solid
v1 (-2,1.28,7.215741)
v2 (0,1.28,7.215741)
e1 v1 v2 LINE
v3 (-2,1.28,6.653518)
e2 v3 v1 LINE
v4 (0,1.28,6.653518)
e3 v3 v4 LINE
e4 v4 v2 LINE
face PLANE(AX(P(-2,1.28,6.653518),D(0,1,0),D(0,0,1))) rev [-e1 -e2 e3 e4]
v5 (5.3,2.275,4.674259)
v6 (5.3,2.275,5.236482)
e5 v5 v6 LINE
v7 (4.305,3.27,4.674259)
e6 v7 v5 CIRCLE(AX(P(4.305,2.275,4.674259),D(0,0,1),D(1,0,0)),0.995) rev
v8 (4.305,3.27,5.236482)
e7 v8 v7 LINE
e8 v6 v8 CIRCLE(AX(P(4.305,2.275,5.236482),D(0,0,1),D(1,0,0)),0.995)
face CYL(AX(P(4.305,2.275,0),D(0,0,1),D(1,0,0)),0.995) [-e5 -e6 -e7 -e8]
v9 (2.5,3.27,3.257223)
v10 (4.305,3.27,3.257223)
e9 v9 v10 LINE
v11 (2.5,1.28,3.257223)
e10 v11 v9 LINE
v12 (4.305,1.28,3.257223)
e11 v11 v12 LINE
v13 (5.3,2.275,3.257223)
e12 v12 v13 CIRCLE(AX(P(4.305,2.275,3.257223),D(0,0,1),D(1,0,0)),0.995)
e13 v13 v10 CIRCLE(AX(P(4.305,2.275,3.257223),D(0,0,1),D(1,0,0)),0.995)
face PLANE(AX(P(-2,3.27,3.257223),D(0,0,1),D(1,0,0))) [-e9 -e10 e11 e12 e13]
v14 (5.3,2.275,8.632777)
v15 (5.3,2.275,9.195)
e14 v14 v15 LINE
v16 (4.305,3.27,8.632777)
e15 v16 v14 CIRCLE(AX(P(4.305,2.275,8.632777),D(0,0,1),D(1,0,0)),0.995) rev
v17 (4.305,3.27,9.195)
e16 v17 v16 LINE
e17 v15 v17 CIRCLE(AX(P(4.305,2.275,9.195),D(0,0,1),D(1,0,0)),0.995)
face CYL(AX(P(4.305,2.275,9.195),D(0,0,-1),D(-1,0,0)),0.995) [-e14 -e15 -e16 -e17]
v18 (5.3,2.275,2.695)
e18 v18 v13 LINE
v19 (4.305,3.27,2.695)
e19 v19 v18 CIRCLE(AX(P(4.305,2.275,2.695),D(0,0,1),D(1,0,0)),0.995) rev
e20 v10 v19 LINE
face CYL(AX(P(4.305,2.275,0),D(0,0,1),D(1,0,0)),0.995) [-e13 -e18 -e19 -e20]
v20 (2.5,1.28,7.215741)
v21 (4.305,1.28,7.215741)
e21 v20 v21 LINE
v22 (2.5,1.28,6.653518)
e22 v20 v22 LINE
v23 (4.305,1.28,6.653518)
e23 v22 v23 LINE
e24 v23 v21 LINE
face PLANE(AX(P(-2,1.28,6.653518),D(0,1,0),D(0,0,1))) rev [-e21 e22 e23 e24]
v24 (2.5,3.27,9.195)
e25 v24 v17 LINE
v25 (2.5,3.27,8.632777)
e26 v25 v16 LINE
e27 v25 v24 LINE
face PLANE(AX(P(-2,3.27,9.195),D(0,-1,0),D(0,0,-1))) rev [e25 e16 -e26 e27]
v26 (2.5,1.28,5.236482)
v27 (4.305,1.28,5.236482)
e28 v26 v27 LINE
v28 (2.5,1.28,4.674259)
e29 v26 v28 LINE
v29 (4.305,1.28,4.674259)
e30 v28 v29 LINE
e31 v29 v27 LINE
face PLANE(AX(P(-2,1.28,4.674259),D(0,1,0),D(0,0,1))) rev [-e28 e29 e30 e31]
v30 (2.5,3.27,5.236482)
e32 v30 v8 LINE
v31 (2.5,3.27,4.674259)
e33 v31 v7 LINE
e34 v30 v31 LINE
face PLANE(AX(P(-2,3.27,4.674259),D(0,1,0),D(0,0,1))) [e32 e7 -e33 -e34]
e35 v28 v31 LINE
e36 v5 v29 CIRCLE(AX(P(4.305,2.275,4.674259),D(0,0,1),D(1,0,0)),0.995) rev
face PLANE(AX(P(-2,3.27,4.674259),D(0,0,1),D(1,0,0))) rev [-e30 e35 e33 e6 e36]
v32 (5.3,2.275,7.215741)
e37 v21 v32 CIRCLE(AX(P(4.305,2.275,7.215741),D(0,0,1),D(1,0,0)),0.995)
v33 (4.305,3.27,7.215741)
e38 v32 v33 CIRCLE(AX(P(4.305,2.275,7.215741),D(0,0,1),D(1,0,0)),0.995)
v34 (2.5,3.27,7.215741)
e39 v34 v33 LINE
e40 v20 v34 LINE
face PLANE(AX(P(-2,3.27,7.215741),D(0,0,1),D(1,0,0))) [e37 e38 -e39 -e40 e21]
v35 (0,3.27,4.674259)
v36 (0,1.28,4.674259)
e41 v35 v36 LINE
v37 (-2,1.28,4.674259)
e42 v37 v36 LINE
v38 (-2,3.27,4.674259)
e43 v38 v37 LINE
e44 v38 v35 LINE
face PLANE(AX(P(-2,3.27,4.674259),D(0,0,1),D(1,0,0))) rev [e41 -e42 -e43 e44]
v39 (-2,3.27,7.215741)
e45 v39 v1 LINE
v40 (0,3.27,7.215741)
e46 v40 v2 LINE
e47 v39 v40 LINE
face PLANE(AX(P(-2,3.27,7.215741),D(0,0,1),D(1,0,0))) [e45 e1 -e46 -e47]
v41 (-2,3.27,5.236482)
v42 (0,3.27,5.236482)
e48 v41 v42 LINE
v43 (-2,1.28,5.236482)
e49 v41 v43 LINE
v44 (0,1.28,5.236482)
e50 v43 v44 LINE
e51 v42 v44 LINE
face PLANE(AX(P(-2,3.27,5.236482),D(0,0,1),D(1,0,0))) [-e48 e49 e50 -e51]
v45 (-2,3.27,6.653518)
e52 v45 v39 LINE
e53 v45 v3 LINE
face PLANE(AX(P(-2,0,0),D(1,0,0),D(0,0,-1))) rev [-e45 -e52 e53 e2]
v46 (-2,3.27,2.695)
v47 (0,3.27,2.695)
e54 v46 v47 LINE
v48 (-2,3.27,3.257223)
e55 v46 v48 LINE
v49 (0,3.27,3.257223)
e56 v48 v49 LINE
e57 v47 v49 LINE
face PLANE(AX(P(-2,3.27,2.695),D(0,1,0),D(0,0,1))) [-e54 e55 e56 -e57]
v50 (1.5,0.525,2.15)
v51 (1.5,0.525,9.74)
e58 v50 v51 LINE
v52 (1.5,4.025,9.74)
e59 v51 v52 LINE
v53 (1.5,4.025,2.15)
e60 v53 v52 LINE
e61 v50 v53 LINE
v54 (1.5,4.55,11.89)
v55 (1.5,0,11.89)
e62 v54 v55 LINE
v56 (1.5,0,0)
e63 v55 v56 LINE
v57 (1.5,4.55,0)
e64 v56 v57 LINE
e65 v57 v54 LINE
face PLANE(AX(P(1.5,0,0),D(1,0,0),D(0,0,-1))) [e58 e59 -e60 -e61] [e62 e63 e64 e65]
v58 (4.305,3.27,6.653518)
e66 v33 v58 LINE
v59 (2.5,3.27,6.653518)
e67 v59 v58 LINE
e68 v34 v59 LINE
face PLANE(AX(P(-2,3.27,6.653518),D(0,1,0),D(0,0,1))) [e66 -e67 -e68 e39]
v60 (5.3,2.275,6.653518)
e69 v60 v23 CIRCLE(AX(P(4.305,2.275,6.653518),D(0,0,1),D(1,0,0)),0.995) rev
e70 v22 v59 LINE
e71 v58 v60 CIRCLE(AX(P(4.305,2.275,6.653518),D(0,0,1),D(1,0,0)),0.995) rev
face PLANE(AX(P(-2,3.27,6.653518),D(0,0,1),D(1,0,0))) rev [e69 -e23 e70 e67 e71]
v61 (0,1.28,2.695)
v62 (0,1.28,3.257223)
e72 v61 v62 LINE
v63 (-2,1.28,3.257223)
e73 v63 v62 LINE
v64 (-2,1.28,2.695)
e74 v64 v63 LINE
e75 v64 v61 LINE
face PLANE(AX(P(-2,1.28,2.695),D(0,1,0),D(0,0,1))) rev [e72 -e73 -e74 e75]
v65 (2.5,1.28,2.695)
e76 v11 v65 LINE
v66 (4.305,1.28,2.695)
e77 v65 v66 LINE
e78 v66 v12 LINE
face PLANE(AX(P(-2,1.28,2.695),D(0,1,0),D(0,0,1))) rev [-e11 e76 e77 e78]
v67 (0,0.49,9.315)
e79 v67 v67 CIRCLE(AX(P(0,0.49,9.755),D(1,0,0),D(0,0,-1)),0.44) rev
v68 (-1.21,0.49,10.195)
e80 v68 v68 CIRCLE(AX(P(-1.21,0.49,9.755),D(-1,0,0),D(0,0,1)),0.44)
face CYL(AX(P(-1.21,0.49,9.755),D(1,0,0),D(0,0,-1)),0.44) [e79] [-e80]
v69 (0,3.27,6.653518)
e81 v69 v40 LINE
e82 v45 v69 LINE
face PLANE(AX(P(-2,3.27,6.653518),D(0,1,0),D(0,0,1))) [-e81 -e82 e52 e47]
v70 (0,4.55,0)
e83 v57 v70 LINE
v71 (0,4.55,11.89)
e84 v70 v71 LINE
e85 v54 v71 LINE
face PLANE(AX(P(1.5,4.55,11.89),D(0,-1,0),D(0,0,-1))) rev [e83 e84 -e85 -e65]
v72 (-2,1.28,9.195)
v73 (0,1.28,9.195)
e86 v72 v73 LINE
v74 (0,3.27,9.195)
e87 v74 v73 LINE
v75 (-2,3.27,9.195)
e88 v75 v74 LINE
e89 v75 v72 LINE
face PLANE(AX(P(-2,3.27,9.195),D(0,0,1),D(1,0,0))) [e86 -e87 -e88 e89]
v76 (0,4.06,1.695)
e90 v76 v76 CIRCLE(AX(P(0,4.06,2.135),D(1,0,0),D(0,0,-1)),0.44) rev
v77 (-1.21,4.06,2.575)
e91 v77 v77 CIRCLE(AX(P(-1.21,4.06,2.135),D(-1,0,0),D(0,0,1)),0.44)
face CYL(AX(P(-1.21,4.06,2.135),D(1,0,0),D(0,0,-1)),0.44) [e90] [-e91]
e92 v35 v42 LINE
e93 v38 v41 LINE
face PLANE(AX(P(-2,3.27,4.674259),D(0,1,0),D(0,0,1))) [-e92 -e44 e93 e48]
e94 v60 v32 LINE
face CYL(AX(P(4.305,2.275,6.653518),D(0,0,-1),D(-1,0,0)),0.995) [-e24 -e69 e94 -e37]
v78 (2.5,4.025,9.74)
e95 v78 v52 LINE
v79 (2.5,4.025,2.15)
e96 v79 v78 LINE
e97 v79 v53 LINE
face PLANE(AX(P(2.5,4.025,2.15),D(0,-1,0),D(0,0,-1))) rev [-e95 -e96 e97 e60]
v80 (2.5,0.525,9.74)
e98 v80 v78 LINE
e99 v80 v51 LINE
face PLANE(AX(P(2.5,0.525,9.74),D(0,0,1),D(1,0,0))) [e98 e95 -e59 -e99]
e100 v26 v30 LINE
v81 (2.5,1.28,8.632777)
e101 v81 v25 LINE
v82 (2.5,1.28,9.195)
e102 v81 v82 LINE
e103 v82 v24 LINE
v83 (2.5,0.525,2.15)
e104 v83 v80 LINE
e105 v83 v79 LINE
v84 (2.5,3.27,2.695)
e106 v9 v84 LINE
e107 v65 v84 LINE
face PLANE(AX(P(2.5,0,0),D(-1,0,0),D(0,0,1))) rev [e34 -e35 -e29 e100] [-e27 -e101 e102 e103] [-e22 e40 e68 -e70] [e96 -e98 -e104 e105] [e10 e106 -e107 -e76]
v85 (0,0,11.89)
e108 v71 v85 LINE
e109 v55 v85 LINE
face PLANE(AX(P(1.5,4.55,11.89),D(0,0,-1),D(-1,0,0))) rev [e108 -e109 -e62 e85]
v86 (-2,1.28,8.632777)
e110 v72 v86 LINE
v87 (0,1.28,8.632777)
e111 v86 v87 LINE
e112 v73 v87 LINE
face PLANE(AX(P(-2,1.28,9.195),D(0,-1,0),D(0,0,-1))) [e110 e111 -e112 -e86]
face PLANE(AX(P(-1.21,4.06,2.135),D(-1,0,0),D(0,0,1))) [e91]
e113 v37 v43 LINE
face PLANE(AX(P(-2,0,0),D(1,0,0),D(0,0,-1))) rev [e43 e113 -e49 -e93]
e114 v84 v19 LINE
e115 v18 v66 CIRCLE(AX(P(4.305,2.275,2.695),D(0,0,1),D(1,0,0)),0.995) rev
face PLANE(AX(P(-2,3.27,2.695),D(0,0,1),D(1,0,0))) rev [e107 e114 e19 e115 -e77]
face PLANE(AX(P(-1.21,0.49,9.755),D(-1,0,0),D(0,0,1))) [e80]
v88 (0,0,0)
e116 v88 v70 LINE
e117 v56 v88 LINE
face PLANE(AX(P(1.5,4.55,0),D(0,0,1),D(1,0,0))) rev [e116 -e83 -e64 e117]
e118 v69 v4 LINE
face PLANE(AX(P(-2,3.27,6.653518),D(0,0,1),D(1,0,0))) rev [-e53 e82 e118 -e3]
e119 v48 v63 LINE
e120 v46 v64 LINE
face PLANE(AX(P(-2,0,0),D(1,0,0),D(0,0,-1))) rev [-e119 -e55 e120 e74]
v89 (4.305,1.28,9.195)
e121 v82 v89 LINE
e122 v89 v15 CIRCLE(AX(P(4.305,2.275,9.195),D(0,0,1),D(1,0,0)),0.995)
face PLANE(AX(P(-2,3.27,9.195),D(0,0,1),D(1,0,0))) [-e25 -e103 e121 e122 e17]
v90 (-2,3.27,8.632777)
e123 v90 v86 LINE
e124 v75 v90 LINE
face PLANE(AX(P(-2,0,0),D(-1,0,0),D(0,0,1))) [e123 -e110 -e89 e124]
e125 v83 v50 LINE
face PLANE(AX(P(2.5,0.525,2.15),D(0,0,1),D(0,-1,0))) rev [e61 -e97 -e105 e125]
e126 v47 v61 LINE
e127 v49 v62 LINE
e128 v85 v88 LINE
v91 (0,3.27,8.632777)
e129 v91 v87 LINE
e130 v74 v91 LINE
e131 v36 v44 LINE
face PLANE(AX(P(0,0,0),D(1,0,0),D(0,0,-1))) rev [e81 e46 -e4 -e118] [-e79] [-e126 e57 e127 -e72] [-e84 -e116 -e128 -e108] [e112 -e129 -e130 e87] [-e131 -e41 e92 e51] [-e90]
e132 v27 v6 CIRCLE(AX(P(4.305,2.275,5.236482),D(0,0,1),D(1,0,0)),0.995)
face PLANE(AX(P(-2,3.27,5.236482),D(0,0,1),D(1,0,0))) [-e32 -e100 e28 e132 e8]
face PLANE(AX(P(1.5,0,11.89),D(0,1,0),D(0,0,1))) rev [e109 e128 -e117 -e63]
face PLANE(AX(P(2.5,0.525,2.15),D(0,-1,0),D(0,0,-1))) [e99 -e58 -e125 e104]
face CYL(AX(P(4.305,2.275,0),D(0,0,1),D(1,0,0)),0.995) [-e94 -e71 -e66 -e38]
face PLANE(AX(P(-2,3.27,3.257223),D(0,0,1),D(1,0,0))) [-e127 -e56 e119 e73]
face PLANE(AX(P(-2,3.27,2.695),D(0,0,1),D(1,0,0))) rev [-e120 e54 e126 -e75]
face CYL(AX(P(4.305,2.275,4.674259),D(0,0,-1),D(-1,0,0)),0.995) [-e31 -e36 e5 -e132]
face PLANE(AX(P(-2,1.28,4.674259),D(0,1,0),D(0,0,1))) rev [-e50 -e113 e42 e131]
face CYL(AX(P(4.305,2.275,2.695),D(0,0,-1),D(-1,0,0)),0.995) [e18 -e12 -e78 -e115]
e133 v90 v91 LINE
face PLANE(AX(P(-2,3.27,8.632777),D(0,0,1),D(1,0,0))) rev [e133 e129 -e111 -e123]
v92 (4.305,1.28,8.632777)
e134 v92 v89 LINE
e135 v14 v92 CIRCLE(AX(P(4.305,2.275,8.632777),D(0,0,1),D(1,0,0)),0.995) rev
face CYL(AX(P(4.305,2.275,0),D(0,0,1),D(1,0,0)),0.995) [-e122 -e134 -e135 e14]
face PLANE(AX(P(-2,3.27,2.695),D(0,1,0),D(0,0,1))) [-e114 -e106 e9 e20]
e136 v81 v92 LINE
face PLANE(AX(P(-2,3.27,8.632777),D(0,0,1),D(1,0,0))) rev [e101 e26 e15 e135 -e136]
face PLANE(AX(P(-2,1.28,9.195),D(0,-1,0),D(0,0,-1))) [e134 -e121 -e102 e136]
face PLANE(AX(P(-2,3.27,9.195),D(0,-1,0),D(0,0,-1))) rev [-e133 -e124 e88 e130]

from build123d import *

# Parameters (mm, degrees)
ESQUISSE2_W        = 11.89
ESQUISSE2_H        = 4.55
BOSS_EXTRU_1_DEPTH = 1.5
ESQUISSE7_W        = 7.59
ESQUISSE7_H        = 3.5
BOSS_EXTRU_2_DEPTH = 1
ESQUISSE8_W        = 0.56222282
ESQUISSE8_H        = 1.99
BOSS_EXTRU_4_DEPTH = 7.3
CONG_6_R           = 0.995
ESQUISSE12_R       = 0.44
BOSS_EXTRU_5_DEPTH = 1.21


with BuildPart() as part:
    # Esquisse2 → Boss.-Extru.1 (new body)
    with BuildSketch(Plane(origin=(0, 0, 0), x_dir=(0, 0, -1), z_dir=(1, 0, 0))):
        with Locations((-5.945, 2.275)):
            Rectangle(ESQUISSE2_W, ESQUISSE2_H)
    extrude(amount=BOSS_EXTRU_1_DEPTH)

    # Esquisse7 → Boss.-Extru.2 (add)
    with BuildSketch(Plane(origin=(1.5, 0, 0), x_dir=(0, 0, -1), z_dir=(1, 0, 0))):
        with Locations((-5.945, 2.275)):
            Rectangle(ESQUISSE7_W, ESQUISSE7_H)
    extrude(amount=BOSS_EXTRU_2_DEPTH)

    # Esquisse8 → Boss.-Extru.4 (add)
    with BuildSketch(Plane(origin=(5.3, 0, 0), x_dir=(0, 0, -1), z_dir=(1, 0, 0))):
        with Locations((-6.93462953, 2.275)):
            Rectangle(ESQUISSE8_W, ESQUISSE8_H)
        with Locations((-2.97611141, 2.275)):
            Rectangle(ESQUISSE8_W, ESQUISSE8_H)
        with Locations((-8.91388859, 2.275)):
            Rectangle(ESQUISSE8_W, ESQUISSE8_H)
        with Locations((-4.95537047, 2.275)):
            Rectangle(ESQUISSE8_W, ESQUISSE8_H)
    extrude(amount=-BOSS_EXTRU_4_DEPTH)

    # Congé6
    cong_6_edges = [part.edges().sort_by_distance(p)[0] for p in [
        (5.3, 1.28, 2.97611141),
        (5.3, 1.28, 4.95537047),
        (5.3, 1.28, 6.93462953),
        (5.3, 1.28, 8.91388859),
        (5.3, 3.27, 8.91388859),
        (5.3, 3.27, 6.93462953),
        (5.3, 3.27, 4.95537047),
        (5.3, 3.27, 2.97611141),
    ]]
    fillet(cong_6_edges, radius=CONG_6_R - 0.0001)  # a hair under: the kernel refuses the full size

    # Esquisse12 → Boss.-Extru.5 (add)
    with BuildSketch(Plane.ZY):
        with Locations(Location((2.135, 4.06, 0), (0, 0, 180))):
            Circle(ESQUISSE12_R)
        with Locations(Location((9.755, 0.49, 0), (0, 0, 180))):
            Circle(ESQUISSE12_R)
    extrude(amount=BOSS_EXTRU_5_DEPTH)


solid = part.part
